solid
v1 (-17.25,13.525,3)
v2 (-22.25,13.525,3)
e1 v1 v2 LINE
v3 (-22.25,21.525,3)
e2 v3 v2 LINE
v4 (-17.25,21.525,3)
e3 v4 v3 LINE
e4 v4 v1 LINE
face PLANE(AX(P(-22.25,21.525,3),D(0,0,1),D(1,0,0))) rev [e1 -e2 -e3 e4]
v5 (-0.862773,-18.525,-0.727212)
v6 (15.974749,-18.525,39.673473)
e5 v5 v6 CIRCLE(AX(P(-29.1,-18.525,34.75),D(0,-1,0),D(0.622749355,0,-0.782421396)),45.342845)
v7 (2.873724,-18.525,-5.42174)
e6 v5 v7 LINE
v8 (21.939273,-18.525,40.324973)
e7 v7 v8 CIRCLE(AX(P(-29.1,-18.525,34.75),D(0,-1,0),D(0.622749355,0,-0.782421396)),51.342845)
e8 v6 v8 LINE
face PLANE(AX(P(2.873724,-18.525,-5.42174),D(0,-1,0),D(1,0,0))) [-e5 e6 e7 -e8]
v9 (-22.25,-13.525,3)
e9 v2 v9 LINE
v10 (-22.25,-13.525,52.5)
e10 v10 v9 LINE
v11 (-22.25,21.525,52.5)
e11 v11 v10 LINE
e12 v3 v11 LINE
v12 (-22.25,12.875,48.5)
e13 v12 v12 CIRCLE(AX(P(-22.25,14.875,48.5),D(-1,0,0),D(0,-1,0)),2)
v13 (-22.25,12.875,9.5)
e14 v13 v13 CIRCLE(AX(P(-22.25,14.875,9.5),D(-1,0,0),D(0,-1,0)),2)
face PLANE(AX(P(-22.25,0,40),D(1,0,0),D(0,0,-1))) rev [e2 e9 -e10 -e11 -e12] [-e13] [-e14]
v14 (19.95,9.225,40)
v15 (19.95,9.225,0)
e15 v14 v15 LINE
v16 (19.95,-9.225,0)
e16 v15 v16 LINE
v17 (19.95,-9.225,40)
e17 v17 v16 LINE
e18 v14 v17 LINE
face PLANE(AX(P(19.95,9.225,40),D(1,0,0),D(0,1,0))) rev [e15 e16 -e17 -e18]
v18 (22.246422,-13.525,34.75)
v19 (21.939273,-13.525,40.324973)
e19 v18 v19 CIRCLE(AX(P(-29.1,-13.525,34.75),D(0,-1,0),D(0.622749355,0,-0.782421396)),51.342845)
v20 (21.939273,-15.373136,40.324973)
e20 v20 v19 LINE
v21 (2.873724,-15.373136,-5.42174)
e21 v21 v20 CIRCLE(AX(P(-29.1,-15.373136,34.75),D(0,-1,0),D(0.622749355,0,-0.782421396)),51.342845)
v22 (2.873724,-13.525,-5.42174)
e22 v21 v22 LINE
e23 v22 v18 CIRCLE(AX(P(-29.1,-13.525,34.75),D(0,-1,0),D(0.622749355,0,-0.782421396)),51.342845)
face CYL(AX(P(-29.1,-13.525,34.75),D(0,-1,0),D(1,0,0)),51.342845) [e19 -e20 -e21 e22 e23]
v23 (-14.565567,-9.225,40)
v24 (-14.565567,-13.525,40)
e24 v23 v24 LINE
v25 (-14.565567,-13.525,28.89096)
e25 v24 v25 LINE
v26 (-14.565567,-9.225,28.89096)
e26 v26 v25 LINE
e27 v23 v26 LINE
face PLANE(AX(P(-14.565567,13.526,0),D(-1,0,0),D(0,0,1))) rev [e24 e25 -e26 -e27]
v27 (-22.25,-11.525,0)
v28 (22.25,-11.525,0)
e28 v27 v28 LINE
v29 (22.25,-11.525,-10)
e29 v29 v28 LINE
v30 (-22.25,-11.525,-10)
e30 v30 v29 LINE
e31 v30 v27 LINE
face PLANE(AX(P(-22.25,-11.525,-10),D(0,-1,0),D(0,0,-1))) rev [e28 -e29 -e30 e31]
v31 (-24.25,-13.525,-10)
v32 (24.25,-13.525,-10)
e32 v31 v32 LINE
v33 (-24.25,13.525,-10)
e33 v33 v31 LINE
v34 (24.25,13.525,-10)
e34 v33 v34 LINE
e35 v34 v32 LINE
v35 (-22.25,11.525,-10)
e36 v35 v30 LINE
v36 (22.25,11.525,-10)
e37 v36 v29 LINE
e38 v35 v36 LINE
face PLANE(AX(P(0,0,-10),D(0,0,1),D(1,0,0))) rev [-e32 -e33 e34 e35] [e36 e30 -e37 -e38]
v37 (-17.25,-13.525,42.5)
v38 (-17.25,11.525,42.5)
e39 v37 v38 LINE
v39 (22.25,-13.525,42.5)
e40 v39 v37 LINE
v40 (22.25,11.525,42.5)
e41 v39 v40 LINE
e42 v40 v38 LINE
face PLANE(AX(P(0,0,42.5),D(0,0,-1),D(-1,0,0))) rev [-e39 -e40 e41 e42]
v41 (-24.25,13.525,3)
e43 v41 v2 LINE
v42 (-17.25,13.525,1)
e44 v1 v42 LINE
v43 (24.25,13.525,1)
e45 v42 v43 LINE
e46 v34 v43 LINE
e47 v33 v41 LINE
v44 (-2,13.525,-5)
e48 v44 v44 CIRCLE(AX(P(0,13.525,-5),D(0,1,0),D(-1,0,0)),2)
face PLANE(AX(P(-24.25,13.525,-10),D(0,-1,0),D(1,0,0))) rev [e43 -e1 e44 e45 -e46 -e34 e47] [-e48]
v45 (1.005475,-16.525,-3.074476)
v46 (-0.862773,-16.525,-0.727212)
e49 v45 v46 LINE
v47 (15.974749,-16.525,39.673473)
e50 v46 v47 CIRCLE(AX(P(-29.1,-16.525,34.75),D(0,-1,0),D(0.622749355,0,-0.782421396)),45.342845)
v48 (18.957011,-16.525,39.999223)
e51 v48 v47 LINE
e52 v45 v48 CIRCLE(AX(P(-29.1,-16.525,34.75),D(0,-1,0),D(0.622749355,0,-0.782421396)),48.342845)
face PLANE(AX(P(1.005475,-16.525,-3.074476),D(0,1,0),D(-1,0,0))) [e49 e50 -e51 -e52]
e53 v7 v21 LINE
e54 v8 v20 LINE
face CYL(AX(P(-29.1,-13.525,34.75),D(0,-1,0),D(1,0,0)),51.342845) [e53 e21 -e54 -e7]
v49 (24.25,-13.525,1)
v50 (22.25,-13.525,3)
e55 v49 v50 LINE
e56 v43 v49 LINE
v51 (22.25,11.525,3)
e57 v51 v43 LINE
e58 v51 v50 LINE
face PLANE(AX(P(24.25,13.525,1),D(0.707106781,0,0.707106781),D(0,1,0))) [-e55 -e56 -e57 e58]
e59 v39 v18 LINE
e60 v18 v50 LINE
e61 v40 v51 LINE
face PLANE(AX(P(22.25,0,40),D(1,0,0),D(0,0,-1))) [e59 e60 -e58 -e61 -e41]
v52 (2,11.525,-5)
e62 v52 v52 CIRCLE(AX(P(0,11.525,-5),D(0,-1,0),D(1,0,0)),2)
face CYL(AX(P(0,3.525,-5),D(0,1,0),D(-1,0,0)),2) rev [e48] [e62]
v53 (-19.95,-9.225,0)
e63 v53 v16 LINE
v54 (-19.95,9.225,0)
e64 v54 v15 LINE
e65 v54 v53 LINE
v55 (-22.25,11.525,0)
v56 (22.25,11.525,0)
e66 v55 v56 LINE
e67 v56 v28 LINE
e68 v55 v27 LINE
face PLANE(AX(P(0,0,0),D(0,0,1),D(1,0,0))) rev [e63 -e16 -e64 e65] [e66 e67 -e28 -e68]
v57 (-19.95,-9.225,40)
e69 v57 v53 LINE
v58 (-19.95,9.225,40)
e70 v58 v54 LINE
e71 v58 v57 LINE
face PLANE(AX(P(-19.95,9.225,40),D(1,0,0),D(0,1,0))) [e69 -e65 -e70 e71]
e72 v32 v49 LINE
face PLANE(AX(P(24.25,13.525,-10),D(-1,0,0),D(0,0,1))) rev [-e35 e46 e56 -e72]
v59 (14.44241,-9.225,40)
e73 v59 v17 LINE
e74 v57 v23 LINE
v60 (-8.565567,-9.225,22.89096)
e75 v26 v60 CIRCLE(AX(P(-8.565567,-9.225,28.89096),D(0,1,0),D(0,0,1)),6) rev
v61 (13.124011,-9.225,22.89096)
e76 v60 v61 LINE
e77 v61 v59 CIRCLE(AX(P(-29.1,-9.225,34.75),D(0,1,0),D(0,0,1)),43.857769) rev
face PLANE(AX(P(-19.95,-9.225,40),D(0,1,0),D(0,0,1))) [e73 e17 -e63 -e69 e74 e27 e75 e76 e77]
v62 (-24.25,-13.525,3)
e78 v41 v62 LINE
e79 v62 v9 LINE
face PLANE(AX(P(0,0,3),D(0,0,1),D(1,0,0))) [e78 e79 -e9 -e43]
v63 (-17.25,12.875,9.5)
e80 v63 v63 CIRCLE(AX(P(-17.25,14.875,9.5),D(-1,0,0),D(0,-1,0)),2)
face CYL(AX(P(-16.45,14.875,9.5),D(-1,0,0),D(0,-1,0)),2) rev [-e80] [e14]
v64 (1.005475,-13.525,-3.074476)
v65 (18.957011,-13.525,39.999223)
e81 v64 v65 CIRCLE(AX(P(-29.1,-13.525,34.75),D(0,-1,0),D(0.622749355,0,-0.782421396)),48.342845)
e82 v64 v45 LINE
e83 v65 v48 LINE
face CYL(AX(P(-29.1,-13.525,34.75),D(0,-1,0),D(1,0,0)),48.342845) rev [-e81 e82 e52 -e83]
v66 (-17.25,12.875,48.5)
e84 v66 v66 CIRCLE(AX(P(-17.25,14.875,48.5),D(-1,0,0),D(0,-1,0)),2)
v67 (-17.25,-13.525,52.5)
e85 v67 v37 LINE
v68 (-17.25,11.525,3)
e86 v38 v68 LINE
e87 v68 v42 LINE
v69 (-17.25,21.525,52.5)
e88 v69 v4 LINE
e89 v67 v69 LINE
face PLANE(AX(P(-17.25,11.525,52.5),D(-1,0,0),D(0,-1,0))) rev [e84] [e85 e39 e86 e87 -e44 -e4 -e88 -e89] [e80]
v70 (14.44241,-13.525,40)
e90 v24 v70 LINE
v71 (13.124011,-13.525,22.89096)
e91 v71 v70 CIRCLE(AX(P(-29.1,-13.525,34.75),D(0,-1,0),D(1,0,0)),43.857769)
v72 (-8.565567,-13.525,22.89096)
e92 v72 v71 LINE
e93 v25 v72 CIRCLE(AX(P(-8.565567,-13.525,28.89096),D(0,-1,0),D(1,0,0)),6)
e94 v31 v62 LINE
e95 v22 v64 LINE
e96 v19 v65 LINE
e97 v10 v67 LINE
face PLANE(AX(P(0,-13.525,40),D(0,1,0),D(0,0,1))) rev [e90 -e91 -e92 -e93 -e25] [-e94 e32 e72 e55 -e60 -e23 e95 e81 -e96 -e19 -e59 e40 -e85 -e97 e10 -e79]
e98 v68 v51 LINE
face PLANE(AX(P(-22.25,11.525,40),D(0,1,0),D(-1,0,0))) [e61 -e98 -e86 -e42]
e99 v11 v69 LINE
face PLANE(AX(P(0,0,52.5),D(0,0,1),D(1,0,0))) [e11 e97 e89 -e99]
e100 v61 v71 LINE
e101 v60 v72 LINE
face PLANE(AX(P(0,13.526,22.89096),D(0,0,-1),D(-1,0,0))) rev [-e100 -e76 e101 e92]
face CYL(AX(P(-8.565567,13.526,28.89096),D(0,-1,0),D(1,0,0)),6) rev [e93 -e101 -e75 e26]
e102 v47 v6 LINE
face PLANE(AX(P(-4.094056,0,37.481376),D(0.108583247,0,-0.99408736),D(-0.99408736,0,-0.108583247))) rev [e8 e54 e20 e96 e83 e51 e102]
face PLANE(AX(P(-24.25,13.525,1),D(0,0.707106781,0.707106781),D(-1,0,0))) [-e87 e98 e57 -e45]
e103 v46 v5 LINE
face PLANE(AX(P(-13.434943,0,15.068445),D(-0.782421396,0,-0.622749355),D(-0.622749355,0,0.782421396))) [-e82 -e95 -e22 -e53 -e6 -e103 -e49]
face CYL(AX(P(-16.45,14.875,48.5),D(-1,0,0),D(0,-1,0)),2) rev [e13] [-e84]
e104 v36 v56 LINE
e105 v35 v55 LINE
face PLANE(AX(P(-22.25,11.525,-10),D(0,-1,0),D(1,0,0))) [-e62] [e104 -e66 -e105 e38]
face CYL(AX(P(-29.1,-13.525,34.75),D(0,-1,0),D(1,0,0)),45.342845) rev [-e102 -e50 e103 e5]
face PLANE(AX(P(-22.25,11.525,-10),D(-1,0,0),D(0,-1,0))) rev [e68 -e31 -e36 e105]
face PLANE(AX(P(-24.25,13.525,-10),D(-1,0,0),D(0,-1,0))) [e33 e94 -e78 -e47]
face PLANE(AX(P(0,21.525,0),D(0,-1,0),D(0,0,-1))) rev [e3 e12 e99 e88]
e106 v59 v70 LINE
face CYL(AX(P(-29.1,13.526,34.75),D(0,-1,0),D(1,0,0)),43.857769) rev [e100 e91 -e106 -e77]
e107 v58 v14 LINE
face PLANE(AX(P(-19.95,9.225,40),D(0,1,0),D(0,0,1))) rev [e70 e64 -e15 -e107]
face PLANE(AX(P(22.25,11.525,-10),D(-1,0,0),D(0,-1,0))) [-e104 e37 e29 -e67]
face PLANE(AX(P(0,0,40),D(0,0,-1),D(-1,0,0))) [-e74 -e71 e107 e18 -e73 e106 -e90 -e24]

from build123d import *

# Parameters (mm, degrees)
SKETCH1_W                = 44.5
SKETCH1_H                = 25.05
SKETCH1_W_2              = 39.9
SKETCH1_H_2              = 18.45
BOSS_EXTRUDE1_DEPTH      = 40
BOSS_EXTRUDE2_START      = 40
BOSS_EXTRUDE2_OUTLINE_W  = 44.5
BOSS_EXTRUDE2_OUTLINE_H  = 25.05
BOSS_EXTRUDE2_DEPTH      = 2.5
BOSS_EXTRUDE3_DEPTH      = 3
BOSS_EXTRUDE3_DEPTH_BACK = 10
SKETCH1_4_W              = 48.5
SKETCH1_4_H              = 27.05
SKETCH1_4_W_2            = 44.5
SKETCH1_4_H_2            = 23.05
SKETCH2_W                = 5
SKETCH2_H                = 25.05
BOSS_EXTRUDE4_DEPTH      = 10
CUT_EXTRUDE1_REACH       = 65.844
SKETCH7_W                = 5
SKETCH7_H                = 49.5
BOSS_EXTRUDE5_DEPTH      = 10
SKETCH8_R                = 2
CUT_EXTRUDE2_DEPTH       = 5.8
CHAMFER1_SIZE            = 2
CHAMFER2_SIZE            = 2
SKETCH9_R                = 2
CUT_EXTRUDE3_DEPTH       = 10


# Read off the part's stored shape, not the designer's step: Boss-Extrude2
with BuildPart() as part:
    # Sketch1 → Boss-Extrude1 (new body)
    with BuildSketch(Plane.XY):
        with Locations((0, -1)):
            Rectangle(SKETCH1_W, SKETCH1_H)
        Rectangle(SKETCH1_W_2, SKETCH1_H_2, mode=Mode.SUBTRACT)
    extrude(amount=BOSS_EXTRUDE1_DEPTH)

    # Boss-Extrude2 outline → Boss-Extrude2 (add)
    with BuildSketch(Plane.XY.offset(BOSS_EXTRUDE2_START)):
        with Locations((0, -1)):
            Rectangle(BOSS_EXTRUDE2_OUTLINE_W, BOSS_EXTRUDE2_OUTLINE_H)
    extrude(amount=BOSS_EXTRUDE2_DEPTH)

    # Sketch1<4> → Boss-Extrude3 (add, two sides: drawn at the far end of the back side and taken through both)
    with BuildSketch(Plane.XY.offset(-BOSS_EXTRUDE3_DEPTH_BACK)):
        Rectangle(SKETCH1_4_W, SKETCH1_4_H)
        Rectangle(SKETCH1_4_W_2, SKETCH1_4_H_2, mode=Mode.SUBTRACT)
    extrude(amount=BOSS_EXTRUDE3_DEPTH + BOSS_EXTRUDE3_DEPTH_BACK)

    # Sketch2 → Boss-Extrude4 (add)
    with BuildSketch(Plane.XY.offset(42.5)):
        with Locations((-19.75, -1)):
            Rectangle(SKETCH2_W, SKETCH2_H)
    extrude(amount=BOSS_EXTRUDE4_DEPTH)

    # Sweep1: sweep along a path in Sketch4
    with BuildLine(Plane.XZ.offset(13.525)) as sweep1_path:
        ThreePointArc((1.009931304, -3.080074503), (15.529238499, 16.150172823), (18.964123835, 40))
    # Sketch6 → Sweep1 (sweep)
    with BuildSketch(Plane(origin=(18.964123835, -13.525, 40), x_dir=(0.9940873595600267, 0, 0.10858324715615325), z_dir=(-0.10858324715615325, 0, 0.9940873595600267))):
        Polygon((-0.007155114, -3), (-3.007155114, -3), (-3.007155114, -5), (2.992844886, -5), (2.992844886, -1.848135777), (2.992844886, 0), (-0.007155114, 0), align=None)
    sweep(path=sweep1_path.line)

    # Sketch4<3> → Cut-Extrude1 (cut, up to next)
    with BuildSketch(Plane.XZ.offset(13.525), mode=Mode.PRIVATE) as cut_extrude1_sk1:
        with BuildLine():
            Line((-14.565566912, 40), (14.442409674, 40))
            ThreePointArc((14.442409674, 40), (14.628132166, 31.380371303), (13.124010953, 22.890959598))
            Line((13.124010953, 22.890959598), (-8.565566912, 22.890959598))
            ThreePointArc((-8.565566912, 22.890959598), (-12.808207599, 24.648318911), (-14.565566912, 28.890959598))
            Line((-14.565566912, 28.890959598), (-14.565566912, 40))
        make_face()
    cut_extrude1_tool1 = extrude(cut_extrude1_sk1.sketch, amount=-CUT_EXTRUDE1_REACH, mode=Mode.PRIVATE) & part.part
    add(cut_extrude1_tool1.solids().sort_by_distance((0.104414, -13.525, 31.62544))[0], mode=Mode.SUBTRACT)

    # Sketch7 → Boss-Extrude5 (add)
    with BuildSketch(Plane(origin=(0, 11.525, 0), x_dir=(1, 0, 0), z_dir=(0, 1, 0))):
        with Locations((-19.75, -27.75)):
            Rectangle(SKETCH7_W, SKETCH7_H)
    extrude(amount=BOSS_EXTRUDE5_DEPTH)

    # Sketch8 → Cut-Extrude2 (cut)
    with BuildSketch(Plane.ZY.offset(22.25)):
        with Locations(Location((48.5, 14.875, 0), (0, 0, 270))):
            Circle(SKETCH8_R)
        with Locations(Location((9.5, 14.875, 0), (0, 0, 270))):
            Circle(SKETCH8_R)
    extrude(amount=-CUT_EXTRUDE2_DEPTH, mode=Mode.SUBTRACT)

    # Chamfer1
    chamfer1_edges = [part.edges().sort_by_distance(p)[0] for p in [
        (3.5, 13.525, 3),
    ]]
    chamfer(chamfer1_edges, length=CHAMFER1_SIZE - 0.0001)  # a hair under: the kernel refuses the full size

    # Chamfer2
    chamfer2_edges = [part.edges().sort_by_distance(p)[0] for p in [
        (24.25, -0.99995, 3),
    ]]
    chamfer(chamfer2_edges, length=CHAMFER2_SIZE)

    # Sketch9 → Cut-Extrude3 (cut)
    with BuildSketch(Plane(origin=(0, 13.525, 0), x_dir=(1, 0, 0), z_dir=(0, 1, 0))):
        with Locations(Location((0, 5, 0), (0, 0, 180))):
            Circle(SKETCH9_R)
    extrude(amount=-CUT_EXTRUDE3_DEPTH, mode=Mode.SUBTRACT)


solid = part.part
